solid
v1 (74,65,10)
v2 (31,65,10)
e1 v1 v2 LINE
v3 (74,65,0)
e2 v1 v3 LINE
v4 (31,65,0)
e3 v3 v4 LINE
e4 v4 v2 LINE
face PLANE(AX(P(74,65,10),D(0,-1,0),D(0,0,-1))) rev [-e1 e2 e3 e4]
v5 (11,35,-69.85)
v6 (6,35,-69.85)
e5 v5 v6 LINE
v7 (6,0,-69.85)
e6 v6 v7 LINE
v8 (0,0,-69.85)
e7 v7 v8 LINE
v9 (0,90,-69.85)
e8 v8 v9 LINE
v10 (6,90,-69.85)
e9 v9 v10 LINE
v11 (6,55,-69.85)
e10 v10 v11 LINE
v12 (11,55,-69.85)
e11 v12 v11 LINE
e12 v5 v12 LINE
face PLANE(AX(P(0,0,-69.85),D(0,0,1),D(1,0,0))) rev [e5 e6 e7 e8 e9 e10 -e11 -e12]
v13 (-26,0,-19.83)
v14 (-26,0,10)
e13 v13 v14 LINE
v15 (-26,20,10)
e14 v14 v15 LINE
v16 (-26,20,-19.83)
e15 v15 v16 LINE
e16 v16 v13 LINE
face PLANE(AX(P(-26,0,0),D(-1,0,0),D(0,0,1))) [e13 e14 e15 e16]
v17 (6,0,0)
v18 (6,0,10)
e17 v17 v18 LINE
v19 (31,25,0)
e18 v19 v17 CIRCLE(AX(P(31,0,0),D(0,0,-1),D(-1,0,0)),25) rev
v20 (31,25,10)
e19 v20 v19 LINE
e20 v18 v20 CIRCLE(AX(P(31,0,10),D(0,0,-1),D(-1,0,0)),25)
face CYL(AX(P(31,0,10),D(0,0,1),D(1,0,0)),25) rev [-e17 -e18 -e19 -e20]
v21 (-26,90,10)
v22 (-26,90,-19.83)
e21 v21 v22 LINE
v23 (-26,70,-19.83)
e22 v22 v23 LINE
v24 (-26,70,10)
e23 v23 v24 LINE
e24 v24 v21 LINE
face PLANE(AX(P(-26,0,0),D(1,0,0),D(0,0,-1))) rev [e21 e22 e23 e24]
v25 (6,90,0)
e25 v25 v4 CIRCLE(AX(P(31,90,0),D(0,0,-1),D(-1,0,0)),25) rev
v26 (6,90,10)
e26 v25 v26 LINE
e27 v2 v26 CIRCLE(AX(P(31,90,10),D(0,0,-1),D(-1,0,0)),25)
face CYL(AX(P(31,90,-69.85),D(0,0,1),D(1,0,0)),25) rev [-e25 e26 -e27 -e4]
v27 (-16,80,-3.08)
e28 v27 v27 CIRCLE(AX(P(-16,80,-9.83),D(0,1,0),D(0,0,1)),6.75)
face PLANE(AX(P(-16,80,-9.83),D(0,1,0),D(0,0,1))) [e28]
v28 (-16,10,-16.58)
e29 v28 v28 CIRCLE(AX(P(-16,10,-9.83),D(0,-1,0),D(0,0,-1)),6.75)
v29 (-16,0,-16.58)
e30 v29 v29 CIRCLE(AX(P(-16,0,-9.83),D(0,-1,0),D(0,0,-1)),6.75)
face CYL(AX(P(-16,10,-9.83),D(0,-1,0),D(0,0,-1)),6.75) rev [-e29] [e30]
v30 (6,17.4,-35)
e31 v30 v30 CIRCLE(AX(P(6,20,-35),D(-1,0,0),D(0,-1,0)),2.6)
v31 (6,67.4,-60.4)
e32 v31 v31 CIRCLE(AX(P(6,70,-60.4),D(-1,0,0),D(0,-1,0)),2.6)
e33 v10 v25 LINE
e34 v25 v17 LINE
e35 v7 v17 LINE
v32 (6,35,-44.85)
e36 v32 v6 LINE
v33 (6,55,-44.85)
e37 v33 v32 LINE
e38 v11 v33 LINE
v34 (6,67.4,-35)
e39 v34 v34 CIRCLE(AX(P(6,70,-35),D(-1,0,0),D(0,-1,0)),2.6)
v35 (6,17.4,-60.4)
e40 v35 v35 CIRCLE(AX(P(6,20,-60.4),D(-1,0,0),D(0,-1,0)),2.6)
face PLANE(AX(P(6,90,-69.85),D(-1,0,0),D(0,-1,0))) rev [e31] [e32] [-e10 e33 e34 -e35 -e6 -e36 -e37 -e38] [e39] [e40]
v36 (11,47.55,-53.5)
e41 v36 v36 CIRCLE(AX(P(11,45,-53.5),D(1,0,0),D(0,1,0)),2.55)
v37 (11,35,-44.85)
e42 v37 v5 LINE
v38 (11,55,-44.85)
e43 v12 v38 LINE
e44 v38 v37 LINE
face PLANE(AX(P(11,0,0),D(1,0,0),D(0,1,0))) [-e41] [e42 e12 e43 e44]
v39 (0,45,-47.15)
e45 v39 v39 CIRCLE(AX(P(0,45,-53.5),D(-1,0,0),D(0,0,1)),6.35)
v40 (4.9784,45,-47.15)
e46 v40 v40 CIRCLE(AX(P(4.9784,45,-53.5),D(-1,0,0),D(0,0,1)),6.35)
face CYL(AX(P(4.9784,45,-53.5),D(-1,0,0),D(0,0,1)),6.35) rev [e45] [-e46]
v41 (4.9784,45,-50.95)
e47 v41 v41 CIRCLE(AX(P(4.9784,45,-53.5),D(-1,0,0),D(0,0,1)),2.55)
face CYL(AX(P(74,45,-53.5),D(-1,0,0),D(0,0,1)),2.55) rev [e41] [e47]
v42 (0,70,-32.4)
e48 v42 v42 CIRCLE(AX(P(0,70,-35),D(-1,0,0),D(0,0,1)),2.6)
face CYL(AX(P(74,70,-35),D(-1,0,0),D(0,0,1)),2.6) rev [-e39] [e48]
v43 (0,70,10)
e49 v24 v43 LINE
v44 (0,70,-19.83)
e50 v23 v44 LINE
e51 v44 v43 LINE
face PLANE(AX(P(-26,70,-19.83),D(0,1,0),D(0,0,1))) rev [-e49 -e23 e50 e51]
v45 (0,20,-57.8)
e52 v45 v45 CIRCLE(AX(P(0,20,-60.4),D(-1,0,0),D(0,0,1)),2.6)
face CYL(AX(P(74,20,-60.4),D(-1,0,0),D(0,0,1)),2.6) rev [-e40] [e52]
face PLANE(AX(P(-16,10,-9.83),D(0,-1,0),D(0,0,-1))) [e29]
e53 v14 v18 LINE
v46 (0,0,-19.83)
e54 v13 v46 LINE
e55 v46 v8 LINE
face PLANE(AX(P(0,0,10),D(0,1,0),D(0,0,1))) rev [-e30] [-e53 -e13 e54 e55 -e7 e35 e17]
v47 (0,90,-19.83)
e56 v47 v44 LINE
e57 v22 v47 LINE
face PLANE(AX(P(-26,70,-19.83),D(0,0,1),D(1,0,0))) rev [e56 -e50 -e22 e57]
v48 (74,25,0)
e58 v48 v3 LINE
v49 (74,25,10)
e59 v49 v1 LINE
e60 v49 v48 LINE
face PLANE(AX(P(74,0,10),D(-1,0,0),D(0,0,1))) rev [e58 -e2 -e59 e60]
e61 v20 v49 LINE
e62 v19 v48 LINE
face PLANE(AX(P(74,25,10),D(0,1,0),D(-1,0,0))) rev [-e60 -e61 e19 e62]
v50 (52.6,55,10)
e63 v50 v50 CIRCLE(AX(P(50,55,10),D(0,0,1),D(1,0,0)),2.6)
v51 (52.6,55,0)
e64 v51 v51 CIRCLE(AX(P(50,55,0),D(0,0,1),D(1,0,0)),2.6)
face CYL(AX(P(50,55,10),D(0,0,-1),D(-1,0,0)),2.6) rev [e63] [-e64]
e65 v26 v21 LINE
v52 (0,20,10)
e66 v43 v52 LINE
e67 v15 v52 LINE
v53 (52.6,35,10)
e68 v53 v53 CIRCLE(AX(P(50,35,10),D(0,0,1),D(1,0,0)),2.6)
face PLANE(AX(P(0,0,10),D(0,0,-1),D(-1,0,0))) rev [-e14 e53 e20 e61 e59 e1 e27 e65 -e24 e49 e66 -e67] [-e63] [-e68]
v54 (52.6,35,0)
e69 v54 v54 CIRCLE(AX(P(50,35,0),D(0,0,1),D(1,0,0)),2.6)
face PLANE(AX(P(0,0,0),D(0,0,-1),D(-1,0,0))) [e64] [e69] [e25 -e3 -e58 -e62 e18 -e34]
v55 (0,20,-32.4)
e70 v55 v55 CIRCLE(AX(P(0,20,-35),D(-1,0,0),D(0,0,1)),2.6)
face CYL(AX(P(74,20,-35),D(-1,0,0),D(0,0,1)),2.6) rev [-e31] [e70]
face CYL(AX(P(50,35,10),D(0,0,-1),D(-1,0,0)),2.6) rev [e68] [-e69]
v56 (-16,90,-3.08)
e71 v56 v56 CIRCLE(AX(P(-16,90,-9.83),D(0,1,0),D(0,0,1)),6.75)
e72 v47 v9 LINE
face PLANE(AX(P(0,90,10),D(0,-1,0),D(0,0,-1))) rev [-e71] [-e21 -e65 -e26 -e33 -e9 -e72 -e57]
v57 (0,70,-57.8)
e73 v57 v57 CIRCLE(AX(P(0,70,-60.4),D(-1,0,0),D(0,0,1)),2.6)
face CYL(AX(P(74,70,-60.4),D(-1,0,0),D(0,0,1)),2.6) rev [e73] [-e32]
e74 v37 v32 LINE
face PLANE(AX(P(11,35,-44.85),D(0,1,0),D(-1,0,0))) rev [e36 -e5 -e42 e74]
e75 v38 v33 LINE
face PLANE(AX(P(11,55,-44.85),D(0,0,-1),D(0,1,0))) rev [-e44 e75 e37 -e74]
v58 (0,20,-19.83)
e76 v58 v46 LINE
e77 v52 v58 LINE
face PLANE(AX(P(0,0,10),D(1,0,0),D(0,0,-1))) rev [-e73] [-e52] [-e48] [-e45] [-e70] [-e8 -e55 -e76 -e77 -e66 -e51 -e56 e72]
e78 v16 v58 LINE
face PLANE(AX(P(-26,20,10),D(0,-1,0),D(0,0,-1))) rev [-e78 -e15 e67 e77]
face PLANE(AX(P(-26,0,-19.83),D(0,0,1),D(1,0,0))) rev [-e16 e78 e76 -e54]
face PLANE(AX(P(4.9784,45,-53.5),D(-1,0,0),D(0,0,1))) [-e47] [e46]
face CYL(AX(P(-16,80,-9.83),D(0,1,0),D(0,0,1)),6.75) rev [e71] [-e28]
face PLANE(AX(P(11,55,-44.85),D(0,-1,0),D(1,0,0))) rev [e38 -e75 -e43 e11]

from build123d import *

# Parameters (mm, degrees)
SKETCH1_W               = 74
SKETCH1_H               = 90
SKETCH1_R               = 2.6
BOSS_EXTRUDE1_DEPTH     = 10
SKETCH2_W               = 6
SKETCH2_H               = 90
BOSS_EXTRUDE2_DEPTH     = 69.85
SKETCH4_W               = 68
SKETCH4_H               = 25
CUT_EXTRUDE3_DEPTH      = 136.849263892
FILLET2_R               = 25
SKETCH8_W               = 29.83
SKETCH8_H               = 20
BOSS_EXTRUDE4_DEPTH     = 26
SKETCH9_R               = 6.75
CUT_EXTRUDE6_DEPTH      = 10
CUT_EXTRUDE7_START      = -10
SKETCH10_R              = 6.75
CUT_EXTRUDE7_DEPTH      = 10
SKETCH11_R              = 6.35
CUT_EXTRUDE8_DEPTH      = 4.9784
SKETCH12_W              = 25
SKETCH12_H              = 20
BOSS_EXTRUDE5_DEPTH     = 5
CUT_EXTRUDE9_DEPTH      = 134.202866961
CUT_EXTRUDE9_DEPTH_BACK = 134.202866961
SKETCH13_R              = 2.55
SKETCH14_R              = 2.6
CUT_EXTRUDE10_DEPTH     = 136.849263892


with BuildPart() as part:
    # Sketch1 → Boss-Extrude1 (new body)
    with BuildSketch(Plane.XY):
        with Locations((37, 45)):
            Rectangle(SKETCH1_W, SKETCH1_H)
        with Locations((50, 55)):
            Circle(SKETCH1_R, mode=Mode.SUBTRACT)
        with Locations((50, 35)):
            Circle(SKETCH1_R, mode=Mode.SUBTRACT)
    extrude(amount=BOSS_EXTRUDE1_DEPTH)

    # Sketch2 → Boss-Extrude2 (add)
    with BuildSketch(Plane(origin=(0, 0, 0), x_dir=(-1, 0, 0), z_dir=(0, 0, -1))):
        with Locations((-3, 45)):
            Rectangle(SKETCH2_W, SKETCH2_H)
    extrude(amount=BOSS_EXTRUDE2_DEPTH)

    # Sketch4 → Cut-Extrude3 (cut, through all)
    with BuildSketch(Plane(origin=(0, 0, 0), x_dir=(-1, 0, 0), z_dir=(0, 0, -1))):
        with Locations((-40, 77.5)):
            Rectangle(SKETCH4_W, SKETCH4_H)
        with Locations((-40, 12.5)):
            Rectangle(SKETCH4_W, SKETCH4_H)
    extrude(amount=-CUT_EXTRUDE3_DEPTH, mode=Mode.SUBTRACT)

    # Fillet2
    fillet2_edges = [part.edges().sort_by_distance(p)[0] for p in [
        (6, 65, 5),
        (6, 25, 5),
    ]]
    fillet(fillet2_edges, radius=FILLET2_R - 0.0001)  # a hair under: the kernel refuses the full size

    # Sketch8 → Boss-Extrude4 (add)
    with BuildSketch(Plane.ZY):
        with Locations((-4.915, 10)):
            Rectangle(SKETCH8_W, SKETCH8_H)
        with Locations((-4.915, 80)):
            Rectangle(SKETCH8_W, SKETCH8_H)
    extrude(amount=BOSS_EXTRUDE4_DEPTH)

    # Sketch9 → Cut-Extrude6 (cut)
    with BuildSketch(Plane.XZ):
        with Locations(Location((-16, -9.83, 0), (0, 0, 270))):
            Circle(SKETCH9_R)
    extrude(amount=-CUT_EXTRUDE6_DEPTH, mode=Mode.SUBTRACT)

    # Sketch10 → Cut-Extrude7 (cut)
    with BuildSketch(Plane(origin=(0, 90, 0), x_dir=(1, 0, 0), z_dir=(0, 1, 0)).offset(CUT_EXTRUDE7_START)):
        with Locations(Location((-16, 9.83, 0), (0, 0, 90))):
            Circle(SKETCH10_R)
    extrude(amount=CUT_EXTRUDE7_DEPTH, mode=Mode.SUBTRACT)

    # Sketch11 → Cut-Extrude8 (cut)
    with BuildSketch(Plane.ZY):
        with Locations((-53.5, 45)):
            Circle(SKETCH11_R)
    extrude(amount=-CUT_EXTRUDE8_DEPTH, mode=Mode.SUBTRACT)

    # Sketch12 → Boss-Extrude5 (add)
    with BuildSketch(Plane(origin=(6, 0, 0), x_dir=(0, 0, -1), z_dir=(1, 0, 0))):
        with Locations((57.35, 45)):
            Rectangle(SKETCH12_W, SKETCH12_H)
    extrude(amount=BOSS_EXTRUDE5_DEPTH)

    # Sketch13 → Cut-Extrude9 (cut, two sides: drawn at the far end of the back side and taken through both)
    with BuildSketch(Plane.ZY.offset(-4.9784).offset(-CUT_EXTRUDE9_DEPTH_BACK)):
        with Locations((-53.5, 45)):
            Circle(SKETCH13_R)
    extrude(amount=CUT_EXTRUDE9_DEPTH + CUT_EXTRUDE9_DEPTH_BACK, mode=Mode.SUBTRACT)

    # Sketch14 → Cut-Extrude10 (cut, through all)
    with BuildSketch(Plane.ZY):
        with Locations((-35, 70)):
            Circle(SKETCH14_R)
        with Locations((-35, 20)):
            Circle(SKETCH14_R)
        with Locations((-60.4, 70)):
            Circle(SKETCH14_R)
        with Locations((-60.4, 20)):
            Circle(SKETCH14_R)
    extrude(amount=-CUT_EXTRUDE10_DEPTH, mode=Mode.SUBTRACT)


solid = part.part
